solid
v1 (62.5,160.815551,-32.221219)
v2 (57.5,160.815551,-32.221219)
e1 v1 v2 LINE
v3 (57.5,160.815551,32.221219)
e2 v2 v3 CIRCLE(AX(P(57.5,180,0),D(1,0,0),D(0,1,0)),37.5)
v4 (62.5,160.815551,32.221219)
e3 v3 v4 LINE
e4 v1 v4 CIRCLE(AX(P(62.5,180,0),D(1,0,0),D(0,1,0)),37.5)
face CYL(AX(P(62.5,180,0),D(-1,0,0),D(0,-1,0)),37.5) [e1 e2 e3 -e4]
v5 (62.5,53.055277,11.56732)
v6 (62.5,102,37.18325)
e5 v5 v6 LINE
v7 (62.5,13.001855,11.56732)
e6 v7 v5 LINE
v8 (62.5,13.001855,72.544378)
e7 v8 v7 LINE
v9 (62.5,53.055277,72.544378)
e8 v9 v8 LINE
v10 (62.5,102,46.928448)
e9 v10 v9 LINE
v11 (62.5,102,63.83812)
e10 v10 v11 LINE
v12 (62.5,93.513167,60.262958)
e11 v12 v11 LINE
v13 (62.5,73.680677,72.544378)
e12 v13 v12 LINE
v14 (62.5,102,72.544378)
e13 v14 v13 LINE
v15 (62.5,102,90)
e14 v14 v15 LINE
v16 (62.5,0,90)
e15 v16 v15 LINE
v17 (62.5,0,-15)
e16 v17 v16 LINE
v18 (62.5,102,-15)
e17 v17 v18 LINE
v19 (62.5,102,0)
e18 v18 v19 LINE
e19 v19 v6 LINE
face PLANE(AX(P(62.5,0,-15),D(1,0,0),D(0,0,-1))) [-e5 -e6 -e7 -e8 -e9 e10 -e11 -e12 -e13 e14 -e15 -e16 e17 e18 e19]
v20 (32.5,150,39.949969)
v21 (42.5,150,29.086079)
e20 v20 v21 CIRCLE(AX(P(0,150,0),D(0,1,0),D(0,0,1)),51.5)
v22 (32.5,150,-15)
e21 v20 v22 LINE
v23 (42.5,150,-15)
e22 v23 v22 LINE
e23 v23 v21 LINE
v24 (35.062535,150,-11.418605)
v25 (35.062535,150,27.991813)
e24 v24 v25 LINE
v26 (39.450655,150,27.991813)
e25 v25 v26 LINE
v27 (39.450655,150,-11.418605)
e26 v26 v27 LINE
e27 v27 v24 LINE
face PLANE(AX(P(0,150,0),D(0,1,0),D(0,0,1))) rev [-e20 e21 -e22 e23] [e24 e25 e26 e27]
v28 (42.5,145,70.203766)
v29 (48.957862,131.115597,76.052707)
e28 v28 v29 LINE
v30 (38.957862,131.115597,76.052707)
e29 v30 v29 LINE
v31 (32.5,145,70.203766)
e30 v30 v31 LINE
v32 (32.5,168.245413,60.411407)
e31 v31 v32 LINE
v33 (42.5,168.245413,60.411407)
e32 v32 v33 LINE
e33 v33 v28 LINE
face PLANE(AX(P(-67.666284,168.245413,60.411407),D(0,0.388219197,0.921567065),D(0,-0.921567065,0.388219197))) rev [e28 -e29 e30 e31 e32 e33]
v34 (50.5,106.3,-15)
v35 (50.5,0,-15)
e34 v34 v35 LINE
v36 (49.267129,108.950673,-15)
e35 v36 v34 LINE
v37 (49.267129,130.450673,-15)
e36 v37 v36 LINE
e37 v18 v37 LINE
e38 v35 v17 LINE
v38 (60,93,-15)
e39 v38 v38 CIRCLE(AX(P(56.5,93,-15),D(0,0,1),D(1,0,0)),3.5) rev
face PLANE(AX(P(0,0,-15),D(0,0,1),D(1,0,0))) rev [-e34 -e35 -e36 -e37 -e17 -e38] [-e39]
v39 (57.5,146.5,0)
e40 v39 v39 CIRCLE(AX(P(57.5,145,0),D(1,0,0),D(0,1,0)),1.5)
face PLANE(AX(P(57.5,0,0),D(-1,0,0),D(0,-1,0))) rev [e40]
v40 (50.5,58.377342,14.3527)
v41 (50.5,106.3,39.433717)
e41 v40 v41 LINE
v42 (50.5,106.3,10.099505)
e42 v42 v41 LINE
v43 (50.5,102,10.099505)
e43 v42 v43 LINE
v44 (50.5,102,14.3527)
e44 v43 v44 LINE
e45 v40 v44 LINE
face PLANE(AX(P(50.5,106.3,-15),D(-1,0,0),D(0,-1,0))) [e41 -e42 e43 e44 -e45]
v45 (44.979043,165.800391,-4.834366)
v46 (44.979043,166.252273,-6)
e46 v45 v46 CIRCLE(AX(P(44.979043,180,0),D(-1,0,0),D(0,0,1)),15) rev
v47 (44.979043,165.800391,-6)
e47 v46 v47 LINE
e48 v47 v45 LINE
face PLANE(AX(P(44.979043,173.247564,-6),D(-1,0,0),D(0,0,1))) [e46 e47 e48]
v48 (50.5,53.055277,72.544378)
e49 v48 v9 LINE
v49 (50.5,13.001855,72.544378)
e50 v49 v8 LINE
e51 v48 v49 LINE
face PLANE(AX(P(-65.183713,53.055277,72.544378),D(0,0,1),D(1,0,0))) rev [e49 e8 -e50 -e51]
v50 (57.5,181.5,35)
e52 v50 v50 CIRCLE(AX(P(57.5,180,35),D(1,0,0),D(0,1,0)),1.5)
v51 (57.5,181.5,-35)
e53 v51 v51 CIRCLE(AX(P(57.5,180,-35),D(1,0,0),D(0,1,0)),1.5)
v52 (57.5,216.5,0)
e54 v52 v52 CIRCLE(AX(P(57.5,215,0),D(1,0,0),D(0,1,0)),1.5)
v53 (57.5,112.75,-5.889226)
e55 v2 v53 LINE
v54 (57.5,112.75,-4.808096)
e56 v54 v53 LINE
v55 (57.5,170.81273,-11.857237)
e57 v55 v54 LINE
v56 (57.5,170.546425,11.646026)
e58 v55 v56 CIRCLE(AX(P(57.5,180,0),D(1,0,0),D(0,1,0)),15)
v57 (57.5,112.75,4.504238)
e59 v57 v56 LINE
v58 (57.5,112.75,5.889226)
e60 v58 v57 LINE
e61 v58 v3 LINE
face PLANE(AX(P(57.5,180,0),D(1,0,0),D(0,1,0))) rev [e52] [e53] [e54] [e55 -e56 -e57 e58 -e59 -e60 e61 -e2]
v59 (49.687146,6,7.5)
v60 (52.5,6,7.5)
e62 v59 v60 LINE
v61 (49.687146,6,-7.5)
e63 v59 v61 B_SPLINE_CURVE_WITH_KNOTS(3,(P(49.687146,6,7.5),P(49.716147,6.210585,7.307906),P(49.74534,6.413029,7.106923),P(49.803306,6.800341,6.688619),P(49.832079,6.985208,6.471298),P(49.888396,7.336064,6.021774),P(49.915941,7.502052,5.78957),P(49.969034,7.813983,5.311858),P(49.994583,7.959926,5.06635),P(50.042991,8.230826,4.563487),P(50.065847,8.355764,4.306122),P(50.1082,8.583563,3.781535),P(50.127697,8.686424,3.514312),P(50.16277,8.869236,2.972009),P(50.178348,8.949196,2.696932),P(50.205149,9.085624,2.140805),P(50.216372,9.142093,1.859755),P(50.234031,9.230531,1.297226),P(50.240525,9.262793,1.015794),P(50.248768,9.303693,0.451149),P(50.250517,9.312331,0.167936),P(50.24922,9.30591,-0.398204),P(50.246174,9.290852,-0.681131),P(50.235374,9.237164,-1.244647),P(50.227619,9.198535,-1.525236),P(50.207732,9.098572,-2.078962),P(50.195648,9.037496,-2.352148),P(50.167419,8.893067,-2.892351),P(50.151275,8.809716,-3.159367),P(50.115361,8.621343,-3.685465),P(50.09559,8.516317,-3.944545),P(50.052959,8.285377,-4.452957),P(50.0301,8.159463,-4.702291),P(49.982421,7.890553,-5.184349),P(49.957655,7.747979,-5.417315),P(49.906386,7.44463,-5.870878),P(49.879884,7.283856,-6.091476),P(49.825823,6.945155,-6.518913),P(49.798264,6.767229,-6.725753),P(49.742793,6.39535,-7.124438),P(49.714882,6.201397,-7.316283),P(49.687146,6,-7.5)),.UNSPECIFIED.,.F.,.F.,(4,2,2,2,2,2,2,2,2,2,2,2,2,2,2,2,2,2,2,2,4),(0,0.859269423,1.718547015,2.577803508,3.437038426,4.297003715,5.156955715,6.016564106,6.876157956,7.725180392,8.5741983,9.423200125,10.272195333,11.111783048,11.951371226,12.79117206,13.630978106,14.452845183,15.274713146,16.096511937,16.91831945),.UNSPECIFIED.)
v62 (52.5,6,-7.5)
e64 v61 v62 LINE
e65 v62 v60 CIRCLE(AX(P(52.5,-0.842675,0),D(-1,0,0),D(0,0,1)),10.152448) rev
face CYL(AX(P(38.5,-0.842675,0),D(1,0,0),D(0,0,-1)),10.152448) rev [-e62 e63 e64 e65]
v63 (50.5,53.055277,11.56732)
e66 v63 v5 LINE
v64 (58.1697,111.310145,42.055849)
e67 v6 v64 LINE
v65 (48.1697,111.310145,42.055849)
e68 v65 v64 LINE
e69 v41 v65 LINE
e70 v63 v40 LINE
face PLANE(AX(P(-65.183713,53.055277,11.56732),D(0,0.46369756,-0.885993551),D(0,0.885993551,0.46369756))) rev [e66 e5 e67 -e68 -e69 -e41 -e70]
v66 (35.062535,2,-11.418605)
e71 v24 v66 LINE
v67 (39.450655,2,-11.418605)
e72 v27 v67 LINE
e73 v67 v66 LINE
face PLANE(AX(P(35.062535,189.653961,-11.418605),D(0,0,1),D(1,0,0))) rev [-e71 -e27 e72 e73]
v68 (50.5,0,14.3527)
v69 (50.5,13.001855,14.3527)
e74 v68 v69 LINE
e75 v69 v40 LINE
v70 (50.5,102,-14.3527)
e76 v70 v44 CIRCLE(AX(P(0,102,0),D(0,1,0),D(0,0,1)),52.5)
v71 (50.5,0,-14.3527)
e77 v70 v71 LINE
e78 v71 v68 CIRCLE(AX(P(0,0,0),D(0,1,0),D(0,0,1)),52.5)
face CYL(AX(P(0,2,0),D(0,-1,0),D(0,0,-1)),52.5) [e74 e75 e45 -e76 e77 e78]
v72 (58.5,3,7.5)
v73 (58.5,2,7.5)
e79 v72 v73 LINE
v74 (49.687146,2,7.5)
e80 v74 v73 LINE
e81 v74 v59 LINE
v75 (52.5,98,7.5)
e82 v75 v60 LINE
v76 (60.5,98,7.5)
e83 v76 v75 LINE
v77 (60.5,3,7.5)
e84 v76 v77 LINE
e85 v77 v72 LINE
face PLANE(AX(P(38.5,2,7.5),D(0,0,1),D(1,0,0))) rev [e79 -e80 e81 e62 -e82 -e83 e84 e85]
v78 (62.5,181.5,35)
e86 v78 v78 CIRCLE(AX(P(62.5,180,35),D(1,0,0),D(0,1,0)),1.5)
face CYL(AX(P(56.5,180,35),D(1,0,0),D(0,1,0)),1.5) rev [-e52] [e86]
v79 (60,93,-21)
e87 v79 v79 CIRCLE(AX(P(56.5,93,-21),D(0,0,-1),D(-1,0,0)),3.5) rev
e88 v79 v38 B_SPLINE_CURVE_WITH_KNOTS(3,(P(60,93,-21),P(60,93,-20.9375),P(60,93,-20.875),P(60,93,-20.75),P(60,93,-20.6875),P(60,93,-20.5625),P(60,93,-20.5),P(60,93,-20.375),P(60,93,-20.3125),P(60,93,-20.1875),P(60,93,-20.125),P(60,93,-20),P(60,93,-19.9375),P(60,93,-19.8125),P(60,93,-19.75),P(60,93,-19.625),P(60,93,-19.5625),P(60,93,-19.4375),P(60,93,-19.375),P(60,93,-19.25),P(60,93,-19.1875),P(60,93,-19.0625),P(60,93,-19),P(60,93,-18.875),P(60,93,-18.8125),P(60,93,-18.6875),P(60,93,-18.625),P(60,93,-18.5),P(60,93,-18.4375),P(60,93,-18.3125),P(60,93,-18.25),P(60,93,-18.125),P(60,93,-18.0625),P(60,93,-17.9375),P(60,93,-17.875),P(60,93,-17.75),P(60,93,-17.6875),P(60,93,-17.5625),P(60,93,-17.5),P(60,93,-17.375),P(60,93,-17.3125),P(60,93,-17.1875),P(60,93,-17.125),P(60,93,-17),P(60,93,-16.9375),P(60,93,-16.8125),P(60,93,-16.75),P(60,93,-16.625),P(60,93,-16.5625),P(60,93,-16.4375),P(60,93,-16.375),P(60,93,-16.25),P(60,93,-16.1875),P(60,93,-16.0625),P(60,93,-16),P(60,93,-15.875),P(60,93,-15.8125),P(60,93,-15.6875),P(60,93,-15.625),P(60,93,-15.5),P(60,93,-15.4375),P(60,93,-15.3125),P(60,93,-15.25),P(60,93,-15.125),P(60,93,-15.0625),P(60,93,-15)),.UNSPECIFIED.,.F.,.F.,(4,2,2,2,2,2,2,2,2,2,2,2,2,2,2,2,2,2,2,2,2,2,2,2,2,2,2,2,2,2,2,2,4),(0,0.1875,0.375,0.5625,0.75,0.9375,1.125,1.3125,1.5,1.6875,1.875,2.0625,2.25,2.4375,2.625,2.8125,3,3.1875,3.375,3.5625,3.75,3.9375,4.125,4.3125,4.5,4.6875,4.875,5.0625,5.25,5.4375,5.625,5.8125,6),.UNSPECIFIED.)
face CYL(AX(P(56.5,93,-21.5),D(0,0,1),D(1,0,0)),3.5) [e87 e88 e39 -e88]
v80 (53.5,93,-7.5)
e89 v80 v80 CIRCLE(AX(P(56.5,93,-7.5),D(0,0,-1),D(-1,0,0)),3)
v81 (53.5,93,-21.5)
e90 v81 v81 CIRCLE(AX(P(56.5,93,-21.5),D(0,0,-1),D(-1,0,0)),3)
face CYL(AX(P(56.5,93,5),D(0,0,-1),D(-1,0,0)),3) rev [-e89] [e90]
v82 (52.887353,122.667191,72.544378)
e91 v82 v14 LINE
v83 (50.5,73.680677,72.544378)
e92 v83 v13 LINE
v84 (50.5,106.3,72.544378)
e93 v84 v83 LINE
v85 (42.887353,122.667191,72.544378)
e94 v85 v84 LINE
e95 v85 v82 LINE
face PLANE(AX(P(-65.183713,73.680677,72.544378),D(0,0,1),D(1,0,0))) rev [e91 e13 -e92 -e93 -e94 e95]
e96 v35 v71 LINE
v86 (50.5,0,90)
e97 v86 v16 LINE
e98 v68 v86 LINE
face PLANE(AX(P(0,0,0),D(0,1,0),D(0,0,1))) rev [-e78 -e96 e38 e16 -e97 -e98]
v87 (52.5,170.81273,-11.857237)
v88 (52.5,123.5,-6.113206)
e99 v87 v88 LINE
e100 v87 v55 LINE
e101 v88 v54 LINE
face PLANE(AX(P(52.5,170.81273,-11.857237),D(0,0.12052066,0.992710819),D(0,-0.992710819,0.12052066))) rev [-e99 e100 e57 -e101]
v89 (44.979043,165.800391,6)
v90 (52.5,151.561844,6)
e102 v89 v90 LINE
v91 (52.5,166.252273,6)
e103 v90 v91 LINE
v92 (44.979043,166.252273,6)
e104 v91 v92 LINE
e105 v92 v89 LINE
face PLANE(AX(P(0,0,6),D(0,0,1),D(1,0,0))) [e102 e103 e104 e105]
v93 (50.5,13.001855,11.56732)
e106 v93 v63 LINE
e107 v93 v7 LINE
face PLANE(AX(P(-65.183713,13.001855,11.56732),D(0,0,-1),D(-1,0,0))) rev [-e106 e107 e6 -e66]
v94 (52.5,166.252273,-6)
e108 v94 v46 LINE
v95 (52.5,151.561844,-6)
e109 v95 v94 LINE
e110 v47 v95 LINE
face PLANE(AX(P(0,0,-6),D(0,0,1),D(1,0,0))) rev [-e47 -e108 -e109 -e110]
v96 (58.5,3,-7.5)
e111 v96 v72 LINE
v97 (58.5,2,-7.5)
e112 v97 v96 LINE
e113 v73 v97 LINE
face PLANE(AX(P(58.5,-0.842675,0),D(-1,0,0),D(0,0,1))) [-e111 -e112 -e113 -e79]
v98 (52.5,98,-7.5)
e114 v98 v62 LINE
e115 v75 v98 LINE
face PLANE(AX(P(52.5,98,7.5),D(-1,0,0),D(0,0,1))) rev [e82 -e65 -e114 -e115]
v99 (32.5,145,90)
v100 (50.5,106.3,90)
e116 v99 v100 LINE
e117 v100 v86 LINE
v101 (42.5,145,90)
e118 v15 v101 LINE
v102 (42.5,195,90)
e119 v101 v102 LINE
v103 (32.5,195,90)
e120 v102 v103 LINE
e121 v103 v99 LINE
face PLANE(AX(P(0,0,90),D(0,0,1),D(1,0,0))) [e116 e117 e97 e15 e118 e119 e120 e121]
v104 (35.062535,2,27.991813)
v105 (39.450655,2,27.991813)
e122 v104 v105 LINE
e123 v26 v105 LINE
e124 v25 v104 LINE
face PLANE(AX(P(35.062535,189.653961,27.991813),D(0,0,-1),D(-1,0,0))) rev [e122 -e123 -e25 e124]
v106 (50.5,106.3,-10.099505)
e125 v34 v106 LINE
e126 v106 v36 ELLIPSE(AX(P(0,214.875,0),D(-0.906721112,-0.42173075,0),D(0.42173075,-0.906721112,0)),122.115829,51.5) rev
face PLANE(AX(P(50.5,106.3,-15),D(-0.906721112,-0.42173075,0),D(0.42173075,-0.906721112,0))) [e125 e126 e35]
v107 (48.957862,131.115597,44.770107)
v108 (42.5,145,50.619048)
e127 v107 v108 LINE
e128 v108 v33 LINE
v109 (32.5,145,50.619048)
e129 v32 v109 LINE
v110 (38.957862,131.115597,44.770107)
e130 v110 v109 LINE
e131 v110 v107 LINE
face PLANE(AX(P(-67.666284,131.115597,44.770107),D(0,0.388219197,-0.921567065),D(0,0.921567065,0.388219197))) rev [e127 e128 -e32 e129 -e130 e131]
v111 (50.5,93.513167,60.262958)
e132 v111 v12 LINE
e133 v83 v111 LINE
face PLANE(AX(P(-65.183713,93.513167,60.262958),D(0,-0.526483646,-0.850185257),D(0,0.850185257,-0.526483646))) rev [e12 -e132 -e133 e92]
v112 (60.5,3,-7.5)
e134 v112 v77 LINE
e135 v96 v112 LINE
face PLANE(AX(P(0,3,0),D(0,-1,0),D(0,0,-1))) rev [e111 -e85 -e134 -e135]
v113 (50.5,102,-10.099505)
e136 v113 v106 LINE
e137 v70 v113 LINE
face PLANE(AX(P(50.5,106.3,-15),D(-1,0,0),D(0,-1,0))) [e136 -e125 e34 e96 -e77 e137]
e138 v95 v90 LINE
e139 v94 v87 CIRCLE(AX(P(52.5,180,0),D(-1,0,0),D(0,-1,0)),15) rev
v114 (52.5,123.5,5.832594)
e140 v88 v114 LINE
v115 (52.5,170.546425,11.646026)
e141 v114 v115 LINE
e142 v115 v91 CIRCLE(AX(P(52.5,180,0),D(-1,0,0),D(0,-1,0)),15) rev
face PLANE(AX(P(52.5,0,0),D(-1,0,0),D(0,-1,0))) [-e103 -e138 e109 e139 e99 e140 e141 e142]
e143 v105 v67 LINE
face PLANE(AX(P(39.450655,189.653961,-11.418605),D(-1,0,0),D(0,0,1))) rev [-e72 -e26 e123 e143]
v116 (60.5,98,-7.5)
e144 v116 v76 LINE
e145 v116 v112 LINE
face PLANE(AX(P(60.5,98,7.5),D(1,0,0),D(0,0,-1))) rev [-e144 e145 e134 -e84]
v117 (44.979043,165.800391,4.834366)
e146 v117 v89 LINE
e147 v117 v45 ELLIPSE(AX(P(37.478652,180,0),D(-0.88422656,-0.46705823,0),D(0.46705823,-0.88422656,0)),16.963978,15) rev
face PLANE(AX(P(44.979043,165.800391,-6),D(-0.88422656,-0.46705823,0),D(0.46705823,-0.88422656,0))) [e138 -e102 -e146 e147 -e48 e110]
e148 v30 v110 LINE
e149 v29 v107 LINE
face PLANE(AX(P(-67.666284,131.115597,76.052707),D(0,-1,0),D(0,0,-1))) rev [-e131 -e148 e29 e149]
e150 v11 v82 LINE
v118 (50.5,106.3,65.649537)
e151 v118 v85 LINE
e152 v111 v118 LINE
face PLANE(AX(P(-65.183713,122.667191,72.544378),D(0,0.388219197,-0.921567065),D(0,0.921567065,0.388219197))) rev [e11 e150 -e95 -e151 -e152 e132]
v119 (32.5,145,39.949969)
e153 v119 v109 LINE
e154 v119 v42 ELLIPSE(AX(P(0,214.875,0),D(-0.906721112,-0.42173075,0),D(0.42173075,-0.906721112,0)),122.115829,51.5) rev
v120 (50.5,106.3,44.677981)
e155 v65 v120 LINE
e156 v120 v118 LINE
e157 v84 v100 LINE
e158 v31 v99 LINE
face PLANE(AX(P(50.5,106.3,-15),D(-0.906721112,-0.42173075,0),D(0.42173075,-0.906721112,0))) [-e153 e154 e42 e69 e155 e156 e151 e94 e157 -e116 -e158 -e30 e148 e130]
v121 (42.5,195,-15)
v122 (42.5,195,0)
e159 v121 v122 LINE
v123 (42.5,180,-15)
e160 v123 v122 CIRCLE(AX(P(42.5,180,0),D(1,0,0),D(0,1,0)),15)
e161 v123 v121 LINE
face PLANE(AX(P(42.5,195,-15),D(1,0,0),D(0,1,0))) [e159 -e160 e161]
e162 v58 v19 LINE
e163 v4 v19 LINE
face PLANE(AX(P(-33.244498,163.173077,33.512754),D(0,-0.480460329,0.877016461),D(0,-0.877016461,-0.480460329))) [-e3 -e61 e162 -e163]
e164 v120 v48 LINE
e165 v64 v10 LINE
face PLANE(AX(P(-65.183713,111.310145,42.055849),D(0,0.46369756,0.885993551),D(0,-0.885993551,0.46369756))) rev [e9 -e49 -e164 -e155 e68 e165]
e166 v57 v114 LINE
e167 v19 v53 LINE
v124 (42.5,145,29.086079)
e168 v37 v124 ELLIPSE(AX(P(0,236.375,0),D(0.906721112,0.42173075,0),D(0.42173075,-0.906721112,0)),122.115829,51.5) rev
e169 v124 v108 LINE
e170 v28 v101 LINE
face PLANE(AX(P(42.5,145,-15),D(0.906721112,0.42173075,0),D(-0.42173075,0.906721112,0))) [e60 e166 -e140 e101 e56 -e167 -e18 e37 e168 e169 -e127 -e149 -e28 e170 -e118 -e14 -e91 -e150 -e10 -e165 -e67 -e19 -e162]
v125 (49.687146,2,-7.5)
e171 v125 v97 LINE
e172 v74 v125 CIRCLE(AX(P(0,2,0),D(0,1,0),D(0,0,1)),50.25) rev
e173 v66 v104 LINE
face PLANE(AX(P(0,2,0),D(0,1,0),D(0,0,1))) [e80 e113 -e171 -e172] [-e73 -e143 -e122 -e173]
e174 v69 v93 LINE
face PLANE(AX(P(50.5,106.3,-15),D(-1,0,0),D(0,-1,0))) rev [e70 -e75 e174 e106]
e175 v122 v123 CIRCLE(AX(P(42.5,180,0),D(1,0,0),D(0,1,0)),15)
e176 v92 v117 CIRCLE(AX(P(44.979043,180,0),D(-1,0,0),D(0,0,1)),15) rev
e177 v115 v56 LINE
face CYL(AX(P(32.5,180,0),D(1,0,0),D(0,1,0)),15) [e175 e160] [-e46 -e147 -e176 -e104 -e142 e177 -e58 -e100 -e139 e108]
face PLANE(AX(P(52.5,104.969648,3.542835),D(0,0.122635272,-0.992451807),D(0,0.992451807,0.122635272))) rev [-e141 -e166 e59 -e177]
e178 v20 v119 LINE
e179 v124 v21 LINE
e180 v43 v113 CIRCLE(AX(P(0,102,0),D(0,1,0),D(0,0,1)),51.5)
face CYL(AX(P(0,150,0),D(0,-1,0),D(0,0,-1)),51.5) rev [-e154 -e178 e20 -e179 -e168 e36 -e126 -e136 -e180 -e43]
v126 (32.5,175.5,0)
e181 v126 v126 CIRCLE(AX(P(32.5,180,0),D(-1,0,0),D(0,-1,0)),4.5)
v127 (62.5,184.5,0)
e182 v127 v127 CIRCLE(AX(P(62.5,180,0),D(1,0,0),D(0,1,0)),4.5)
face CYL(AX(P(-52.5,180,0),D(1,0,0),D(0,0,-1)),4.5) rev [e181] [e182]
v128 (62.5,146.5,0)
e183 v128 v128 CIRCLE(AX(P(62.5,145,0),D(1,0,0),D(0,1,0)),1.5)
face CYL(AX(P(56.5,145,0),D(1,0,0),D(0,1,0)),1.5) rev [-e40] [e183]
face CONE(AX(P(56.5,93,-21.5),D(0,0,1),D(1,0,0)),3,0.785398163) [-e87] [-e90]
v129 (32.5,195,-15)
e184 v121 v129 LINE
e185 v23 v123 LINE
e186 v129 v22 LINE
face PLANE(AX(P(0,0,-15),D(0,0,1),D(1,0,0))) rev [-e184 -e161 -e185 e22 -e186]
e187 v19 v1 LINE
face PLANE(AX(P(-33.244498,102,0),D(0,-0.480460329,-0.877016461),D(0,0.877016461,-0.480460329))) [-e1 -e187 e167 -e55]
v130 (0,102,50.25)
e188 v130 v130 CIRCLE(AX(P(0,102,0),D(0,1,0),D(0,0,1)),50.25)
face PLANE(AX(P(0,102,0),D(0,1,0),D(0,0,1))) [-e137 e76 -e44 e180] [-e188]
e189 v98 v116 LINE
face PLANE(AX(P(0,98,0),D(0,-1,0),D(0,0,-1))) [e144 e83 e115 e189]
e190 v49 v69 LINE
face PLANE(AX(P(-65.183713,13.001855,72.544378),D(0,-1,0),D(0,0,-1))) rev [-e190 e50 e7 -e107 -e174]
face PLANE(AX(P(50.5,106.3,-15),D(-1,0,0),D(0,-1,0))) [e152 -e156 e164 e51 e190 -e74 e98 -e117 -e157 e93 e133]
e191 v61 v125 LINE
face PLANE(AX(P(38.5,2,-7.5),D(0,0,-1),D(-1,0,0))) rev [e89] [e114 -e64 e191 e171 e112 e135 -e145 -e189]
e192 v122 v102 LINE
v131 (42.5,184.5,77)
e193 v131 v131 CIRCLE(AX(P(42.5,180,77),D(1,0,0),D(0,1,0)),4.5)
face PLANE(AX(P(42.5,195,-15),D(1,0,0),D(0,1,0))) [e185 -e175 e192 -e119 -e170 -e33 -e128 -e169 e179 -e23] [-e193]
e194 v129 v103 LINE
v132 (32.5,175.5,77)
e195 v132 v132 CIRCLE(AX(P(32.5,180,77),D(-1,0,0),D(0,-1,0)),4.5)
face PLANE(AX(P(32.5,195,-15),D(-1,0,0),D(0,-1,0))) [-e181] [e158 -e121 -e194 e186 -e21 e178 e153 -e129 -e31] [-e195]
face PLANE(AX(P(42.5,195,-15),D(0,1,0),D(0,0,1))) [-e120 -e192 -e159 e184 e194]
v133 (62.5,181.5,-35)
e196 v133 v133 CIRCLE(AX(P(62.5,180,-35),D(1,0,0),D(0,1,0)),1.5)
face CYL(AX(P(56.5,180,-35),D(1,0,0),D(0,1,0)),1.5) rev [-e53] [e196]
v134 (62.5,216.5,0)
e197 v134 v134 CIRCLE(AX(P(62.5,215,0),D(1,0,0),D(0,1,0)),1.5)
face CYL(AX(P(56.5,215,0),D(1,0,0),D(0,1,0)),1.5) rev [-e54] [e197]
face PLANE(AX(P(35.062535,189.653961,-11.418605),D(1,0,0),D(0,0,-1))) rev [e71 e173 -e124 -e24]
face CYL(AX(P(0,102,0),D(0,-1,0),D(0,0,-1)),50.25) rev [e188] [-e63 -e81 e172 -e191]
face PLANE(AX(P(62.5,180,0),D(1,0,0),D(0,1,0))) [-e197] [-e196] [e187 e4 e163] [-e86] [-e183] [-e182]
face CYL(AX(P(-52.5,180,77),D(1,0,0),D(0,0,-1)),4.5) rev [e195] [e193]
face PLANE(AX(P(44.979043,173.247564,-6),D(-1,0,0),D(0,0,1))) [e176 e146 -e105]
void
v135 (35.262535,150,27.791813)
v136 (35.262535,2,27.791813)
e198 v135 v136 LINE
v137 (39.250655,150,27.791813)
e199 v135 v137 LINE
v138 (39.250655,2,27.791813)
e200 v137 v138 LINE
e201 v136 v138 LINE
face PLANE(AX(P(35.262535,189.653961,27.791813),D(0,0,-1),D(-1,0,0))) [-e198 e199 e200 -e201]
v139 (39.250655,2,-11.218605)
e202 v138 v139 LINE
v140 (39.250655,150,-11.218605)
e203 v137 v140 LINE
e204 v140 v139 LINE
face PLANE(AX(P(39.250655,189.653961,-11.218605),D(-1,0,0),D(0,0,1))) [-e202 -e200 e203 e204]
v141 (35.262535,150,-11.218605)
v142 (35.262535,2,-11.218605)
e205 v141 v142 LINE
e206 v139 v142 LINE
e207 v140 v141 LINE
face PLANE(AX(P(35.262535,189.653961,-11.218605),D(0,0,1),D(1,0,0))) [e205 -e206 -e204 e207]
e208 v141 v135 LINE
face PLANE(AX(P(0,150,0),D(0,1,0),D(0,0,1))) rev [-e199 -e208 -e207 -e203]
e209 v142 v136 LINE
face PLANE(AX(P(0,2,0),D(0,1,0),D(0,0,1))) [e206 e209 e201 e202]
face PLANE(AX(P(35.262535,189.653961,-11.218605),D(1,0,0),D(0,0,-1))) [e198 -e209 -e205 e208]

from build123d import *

# Parameters (mm, degrees)
SKETCH1_R                = 52.5
BOSS_EXTRUDE1_DEPTH      = 2
SKETCH2_R                = 52.5
SKETCH2_R_2              = 50.25
BOSS_EXTRUDE2_DEPTH      = 100
BOSS_EXTRUDE3_DEPTH      = 90
BOSS_EXTRUDE3_DEPTH_BACK = 15
BOSS_EXTRUDE4_DEPTH      = 15
BOSS_EXTRUDE4_DEPTH_BACK = 10
SKETCH7_R                = 15
SKETCH8_R                = 37.5
BOSS_EXTRUDE5_DEPTH      = 5
SKETCH9_R                = 1.5
CUT_EXTRUDE1_DEPTH       = 6
CUT_EXTRUDE2_DEPTH       = 265.804278799
CUT_EXTRUDE2_DEPTH_BACK  = 265.804278799
SKETCH5_R                = 4.5
CUT_EXTRUDE3_START       = -4
CUT_EXTRUDE3_DEPTH       = 20
CUT_EXTRUDE4_START       = -3
SKETCH11_W               = 8
SKETCH11_H               = 15
CUT_EXTRUDE4_DEPTH       = 95
SKETCH12_R               = 3
CUT_EXTRUDE5_DEPTH       = 20
SKETCH13_R               = 3.5
SKETCH13_R_2             = 3
BOSS_EXTRUDE6_DEPTH      = 6.5
CHAMFER1_SIZE            = 0.5
SKETCH14_R               = 51.5
CUT_EXTRUDE6_DEPTH       = 48
SKETCH15_R               = 1.5
BOSS_EXTRUDE7_DEPTH      = 5
BOSS_EXTRUDE8_DEPTH      = 5
BOSS_EXTRUDE9_DEPTH      = 6
BOSS_EXTRUDE9_DEPTH_BACK = 6
SKETCH18_W               = 4.388119868
SKETCH18_H               = 39.410417959
SKETCH18_W_2             = 3.988119868
SKETCH18_H_2             = 39.010417959
BOSS_EXTRUDE10_DEPTH     = 148
CUT_EXTRUDE7_DEPTH       = 12
CUT_EXTRUDE8_REACH       = 263.976


with BuildPart() as part:
    # Sketch1 → Boss-Extrude1 (new body)
    with BuildSketch(Plane(origin=(0, 0, 0), x_dir=(1, 0, 0), z_dir=(0, 1, 0))):
        with Locations(Location((0, 0, 0), (0, 0, 270))):
            Circle(SKETCH1_R)
    extrude(amount=BOSS_EXTRUDE1_DEPTH)

    # Sketch2 → Boss-Extrude2 (add)
    with BuildSketch(Plane(origin=(0, 2, 0), x_dir=(1, 0, 0), z_dir=(0, 1, 0))):
        with Locations(Location((0, 0, 0), (0, 0, 270))):
            Circle(SKETCH2_R)
        with Locations(Location((0, 0, 0), (0, 0, 270))):
            Circle(SKETCH2_R_2, mode=Mode.SUBTRACT)
    extrude(amount=BOSS_EXTRUDE2_DEPTH)


with BuildPart() as body_2:
    # Sketch6 → Boss-Extrude3 (new, two sides: drawn at the far end of the back side and taken through both)
    with BuildSketch(Plane.XY.offset(-BOSS_EXTRUDE3_DEPTH_BACK)):
        Polygon((32.5, 195), (32.5, 145), (50.5, 106.3), (50.5, 0), (52.5, 0), (62.5, 0), (62.5, 102), (42.5, 145), (42.5, 195), align=None)
    extrude(amount=BOSS_EXTRUDE3_DEPTH + BOSS_EXTRUDE3_DEPTH_BACK)

    # Sketch7 → Boss-Extrude4 (add, two sides: drawn at the far end of the back side and taken through both)
    with BuildSketch(Plane(origin=(42.5, 0, 0), x_dir=(0, 0, -1), z_dir=(1, 0, 0)).offset(-BOSS_EXTRUDE4_DEPTH_BACK)):
        with Locations(Location((0, 180, 0), (0, 0, 90))):
            Circle(SKETCH7_R)
    extrude(amount=BOSS_EXTRUDE4_DEPTH + BOSS_EXTRUDE4_DEPTH_BACK)

    # Sketch8 → Boss-Extrude5 (add)
    with BuildSketch(Plane(origin=(57.5, 0, 0), x_dir=(0, 0, -1), z_dir=(1, 0, 0))):
        with Locations(Location((0, 180, 0), (0, 0, 90))):
            Circle(SKETCH8_R)
    extrude(amount=BOSS_EXTRUDE5_DEPTH)

    # Sketch9 → Cut-Extrude1 (cut)
    with BuildSketch(Plane(origin=(62.5, 0, 0), x_dir=(0, 0, -1), z_dir=(1, 0, 0))):
        with Locations(Location((-35, 180, 0), (0, 0, 90))):
            Circle(SKETCH9_R)
        with Locations(Location((0, 215, 0), (0, 0, 90))):
            Circle(SKETCH9_R)
        with Locations(Location((35, 180, 0), (0, 0, 90))):
            Circle(SKETCH9_R)
        with Locations(Location((0, 145, 0), (0, 0, 90))):
            Circle(SKETCH9_R)
    extrude(amount=-CUT_EXTRUDE1_DEPTH, mode=Mode.SUBTRACT)

    # Sketch5 → Cut-Extrude2 (cut, two sides: drawn at the far end of the back side and taken through both)
    with BuildSketch(Plane(origin=(68.805630826, 0, 0), x_dir=(0, 0, -1), z_dir=(1, 0, 0)).offset(-CUT_EXTRUDE2_DEPTH_BACK)):
        with Locations(Location((0, 180, 0), (0, 0, 90))):
            Circle(SKETCH5_R)
        with Locations(Location((-77, 180, 0), (0, 0, 90))):
            Circle(SKETCH5_R)
    extrude(amount=CUT_EXTRUDE2_DEPTH + CUT_EXTRUDE2_DEPTH_BACK, mode=Mode.SUBTRACT)


with BuildPart() as cut_extrude3_tool:
    # Sketch10 → Cut-Extrude3 (new body)
    with BuildSketch(Plane(origin=(62.5, 0, 0), x_dir=(0, 0, -1), z_dir=(1, 0, 0)).offset(CUT_EXTRUDE3_START)):
        with BuildLine():
            Line((7.5, 2), (-7.5, 2))
            Line((-7.5, 2), (-7.5, 6))
            ThreePointArc((-7.5, 6), (0, 9.309773059), (7.5, 6))
            Line((7.5, 6), (7.5, 2))
        make_face()
    extrude(amount=-CUT_EXTRUDE3_DEPTH)


with BuildPart() as part_1:
    add(part.part)

    # Cut-Extrude3: cut by cut_extrude3_tool
    add(cut_extrude3_tool.part, mode=Mode.SUBTRACT)



with BuildPart() as body_2_1:
    add(body_2.part)

    # Cut-Extrude3: cut by cut_extrude3_tool
    add(cut_extrude3_tool.part, mode=Mode.SUBTRACT)

    # Sketch11 → Cut-Extrude4 (cut)
    with BuildSketch(Plane.XZ.offset(CUT_EXTRUDE4_START)):
        with Locations((56.5, 0)):
            Rectangle(SKETCH11_W, SKETCH11_H)
    extrude(amount=-CUT_EXTRUDE4_DEPTH, mode=Mode.SUBTRACT)

    # Sketch12 → Cut-Extrude5 (cut)
    with BuildSketch(Plane(origin=(0, 0, -15), x_dir=(-1, 0, 0), z_dir=(0, 0, -1))):
        with Locations((-56.5, 93)):
            Circle(SKETCH12_R)
    extrude(amount=-CUT_EXTRUDE5_DEPTH, mode=Mode.SUBTRACT)

    # Sketch13 → Boss-Extrude6 (add)
    with BuildSketch(Plane(origin=(0, 0, -15), x_dir=(-1, 0, 0), z_dir=(0, 0, -1))):
        with Locations(Location((-56.5, 93, 0), (0, 0, 180))):
            Circle(SKETCH13_R)
        with Locations((-56.5, 93)):
            Circle(SKETCH13_R_2, mode=Mode.SUBTRACT)
    extrude(amount=BOSS_EXTRUDE6_DEPTH)

    # Chamfer1
    chamfer1_edges = [body_2_1.edges().sort_by_distance(p)[0] for p in [
        (53, 93, -21.5),
    ]]
    chamfer(chamfer1_edges, length=CHAMFER1_SIZE - 0.0001)  # a hair under: the kernel refuses the full size

    # Sketch14 → Cut-Extrude6 (cut)
    with BuildSketch(Plane(origin=(0, 102, 0), x_dir=(1, 0, 0), z_dir=(0, 1, 0))):
        Circle(SKETCH14_R)
    extrude(amount=CUT_EXTRUDE6_DEPTH, mode=Mode.SUBTRACT)

    # Sketch15 → Boss-Extrude7 (add)
    with BuildSketch(Plane(origin=(62.5, 0, 0), x_dir=(0, 0, -1), z_dir=(1, 0, 0))):
        Polygon((-33.512753614, 163.173076775), (0, 102), (33.512753614, 163.173076775), align=None)
        with Locations(Location((0, 145, 0), (0, 0, 90))):
            Circle(SKETCH15_R, mode=Mode.SUBTRACT)
    extrude(amount=-BOSS_EXTRUDE7_DEPTH)

    # Sketch16 → Boss-Extrude8 (add)
    with BuildSketch(Plane.ZY.offset(-57.5)):
        Polygon((-11.8572367, 170.812729576), (-3.863517383, 104.969648), (3.542835396, 104.969648), (11.646025701, 170.546424731), align=None)
    extrude(amount=BOSS_EXTRUDE8_DEPTH)

    # Sketch17 → Boss-Extrude9 (add, two sides: drawn at the far end of the back side and taken through both)
    with BuildSketch(Plane.XY.offset(-BOSS_EXTRUDE9_DEPTH_BACK)):
        Polygon((44.979042662, 173.247563953), (44.979042662, 165.800390699), (53.161932833, 150.308684598), (53.161932833, 173.247563953), align=None)
    extrude(amount=BOSS_EXTRUDE9_DEPTH + BOSS_EXTRUDE9_DEPTH_BACK)


with BuildPart() as part_2:
    add(part_1.part)

    add(body_2_1.part)  # Boss-Extrude10 merges body 2
    # Sketch18 → Boss-Extrude10 (add)
    with BuildSketch(Plane(origin=(0, 2, 0), x_dir=(1, 0, 0), z_dir=(0, 1, 0))):
        with Locations((37.256595202, -8.286604054)):
            Rectangle(SKETCH18_W, SKETCH18_H)
        with Locations((37.256595202, -8.286604053)):
            Rectangle(SKETCH18_W_2, SKETCH18_H_2, mode=Mode.SUBTRACT)
    extrude(amount=BOSS_EXTRUDE10_DEPTH)

    # Sketch19 → Cut-Extrude7 (cut)
    with BuildSketch(Plane(origin=(62.5, 0, 0), x_dir=(0, 0, -1), z_dir=(1, 0, 0))):
        Polygon((-72.544377907, 13.00185454), (-11.567320289, 13.00185454), (-11.567320289, 53.055277221), (-42.055849098, 111.310144767), (-72.544377907, 53.055277221), align=None)
        Polygon((-76.052706901, 131.115597336), (-44.770106705, 131.115597336), (-60.411406803, 168.245412522), align=None)
        Polygon((-72.544377907, 73.680676562), (-72.544377907, 122.667191379), (-60.262958239, 93.513167119), align=None)
    extrude(amount=-CUT_EXTRUDE7_DEPTH, mode=Mode.SUBTRACT)

    # Cut-Extrude8: up to this face of the body (flat: up to its plane)
    cut_extrude8_end = Plane(part_2.part.faces().sort_by_distance((42.166193849, 124.217683224, 58.964397348))[0])
    # Sketch19<2> → Cut-Extrude8 (cut, up to the picked face)
    with BuildSketch(Plane(origin=(62.5, 0, 0), x_dir=(0, 0, -1), z_dir=(1, 0, 0)), mode=Mode.PRIVATE) as cut_extrude8_sk1:
        Polygon((-72.544377907, 13.00185454), (-11.567320289, 13.00185454), (-11.567320289, 53.055277221), (-42.055849098, 111.310144767), (-72.544377907, 53.055277221), align=None)
    cut_extrude8_tool1 = split(extrude(cut_extrude8_sk1.sketch, amount=-CUT_EXTRUDE8_REACH, mode=Mode.PRIVATE), bisect_by=cut_extrude8_end, keep=Keep.BOTH, mode=Mode.PRIVATE)
    # Sketch19<2> → Cut-Extrude8 (cut, up to the picked face)
    with BuildSketch(Plane(origin=(62.5, 0, 0), x_dir=(0, 0, -1), z_dir=(1, 0, 0)), mode=Mode.PRIVATE) as cut_extrude8_sk2:
        Polygon((-76.052706901, 131.115597336), (-44.770106705, 131.115597336), (-60.411406803, 168.245412522), align=None)
    cut_extrude8_tool2 = split(extrude(cut_extrude8_sk2.sketch, amount=-CUT_EXTRUDE8_REACH, mode=Mode.PRIVATE), bisect_by=cut_extrude8_end, keep=Keep.BOTH, mode=Mode.PRIVATE)
    # Sketch19<2> → Cut-Extrude8 (cut, up to the picked face)
    with BuildSketch(Plane(origin=(62.5, 0, 0), x_dir=(0, 0, -1), z_dir=(1, 0, 0)), mode=Mode.PRIVATE) as cut_extrude8_sk3:
        Polygon((-72.544377907, 73.680676562), (-72.544377907, 122.667191379), (-60.262958239, 93.513167119), align=None)
    cut_extrude8_tool3 = split(extrude(cut_extrude8_sk3.sketch, amount=-CUT_EXTRUDE8_REACH, mode=Mode.PRIVATE), bisect_by=cut_extrude8_end, keep=Keep.BOTH, mode=Mode.PRIVATE)
    add(cut_extrude8_tool1.solids().sort_by(Axis((62.5, 49.636219, 42.055849), (-1, 0, 0)))[0], mode=Mode.SUBTRACT)
    add(cut_extrude8_tool2.solids().sort_by(Axis((62.5, 143.492202, 60.411407), (-1, 0, 0)))[0], mode=Mode.SUBTRACT)
    add(cut_extrude8_tool3.solids().sort_by(Axis((62.5, 96.620345, 68.450571), (-1, 0, 0)))[0], mode=Mode.SUBTRACT)


solid = part_2.part
